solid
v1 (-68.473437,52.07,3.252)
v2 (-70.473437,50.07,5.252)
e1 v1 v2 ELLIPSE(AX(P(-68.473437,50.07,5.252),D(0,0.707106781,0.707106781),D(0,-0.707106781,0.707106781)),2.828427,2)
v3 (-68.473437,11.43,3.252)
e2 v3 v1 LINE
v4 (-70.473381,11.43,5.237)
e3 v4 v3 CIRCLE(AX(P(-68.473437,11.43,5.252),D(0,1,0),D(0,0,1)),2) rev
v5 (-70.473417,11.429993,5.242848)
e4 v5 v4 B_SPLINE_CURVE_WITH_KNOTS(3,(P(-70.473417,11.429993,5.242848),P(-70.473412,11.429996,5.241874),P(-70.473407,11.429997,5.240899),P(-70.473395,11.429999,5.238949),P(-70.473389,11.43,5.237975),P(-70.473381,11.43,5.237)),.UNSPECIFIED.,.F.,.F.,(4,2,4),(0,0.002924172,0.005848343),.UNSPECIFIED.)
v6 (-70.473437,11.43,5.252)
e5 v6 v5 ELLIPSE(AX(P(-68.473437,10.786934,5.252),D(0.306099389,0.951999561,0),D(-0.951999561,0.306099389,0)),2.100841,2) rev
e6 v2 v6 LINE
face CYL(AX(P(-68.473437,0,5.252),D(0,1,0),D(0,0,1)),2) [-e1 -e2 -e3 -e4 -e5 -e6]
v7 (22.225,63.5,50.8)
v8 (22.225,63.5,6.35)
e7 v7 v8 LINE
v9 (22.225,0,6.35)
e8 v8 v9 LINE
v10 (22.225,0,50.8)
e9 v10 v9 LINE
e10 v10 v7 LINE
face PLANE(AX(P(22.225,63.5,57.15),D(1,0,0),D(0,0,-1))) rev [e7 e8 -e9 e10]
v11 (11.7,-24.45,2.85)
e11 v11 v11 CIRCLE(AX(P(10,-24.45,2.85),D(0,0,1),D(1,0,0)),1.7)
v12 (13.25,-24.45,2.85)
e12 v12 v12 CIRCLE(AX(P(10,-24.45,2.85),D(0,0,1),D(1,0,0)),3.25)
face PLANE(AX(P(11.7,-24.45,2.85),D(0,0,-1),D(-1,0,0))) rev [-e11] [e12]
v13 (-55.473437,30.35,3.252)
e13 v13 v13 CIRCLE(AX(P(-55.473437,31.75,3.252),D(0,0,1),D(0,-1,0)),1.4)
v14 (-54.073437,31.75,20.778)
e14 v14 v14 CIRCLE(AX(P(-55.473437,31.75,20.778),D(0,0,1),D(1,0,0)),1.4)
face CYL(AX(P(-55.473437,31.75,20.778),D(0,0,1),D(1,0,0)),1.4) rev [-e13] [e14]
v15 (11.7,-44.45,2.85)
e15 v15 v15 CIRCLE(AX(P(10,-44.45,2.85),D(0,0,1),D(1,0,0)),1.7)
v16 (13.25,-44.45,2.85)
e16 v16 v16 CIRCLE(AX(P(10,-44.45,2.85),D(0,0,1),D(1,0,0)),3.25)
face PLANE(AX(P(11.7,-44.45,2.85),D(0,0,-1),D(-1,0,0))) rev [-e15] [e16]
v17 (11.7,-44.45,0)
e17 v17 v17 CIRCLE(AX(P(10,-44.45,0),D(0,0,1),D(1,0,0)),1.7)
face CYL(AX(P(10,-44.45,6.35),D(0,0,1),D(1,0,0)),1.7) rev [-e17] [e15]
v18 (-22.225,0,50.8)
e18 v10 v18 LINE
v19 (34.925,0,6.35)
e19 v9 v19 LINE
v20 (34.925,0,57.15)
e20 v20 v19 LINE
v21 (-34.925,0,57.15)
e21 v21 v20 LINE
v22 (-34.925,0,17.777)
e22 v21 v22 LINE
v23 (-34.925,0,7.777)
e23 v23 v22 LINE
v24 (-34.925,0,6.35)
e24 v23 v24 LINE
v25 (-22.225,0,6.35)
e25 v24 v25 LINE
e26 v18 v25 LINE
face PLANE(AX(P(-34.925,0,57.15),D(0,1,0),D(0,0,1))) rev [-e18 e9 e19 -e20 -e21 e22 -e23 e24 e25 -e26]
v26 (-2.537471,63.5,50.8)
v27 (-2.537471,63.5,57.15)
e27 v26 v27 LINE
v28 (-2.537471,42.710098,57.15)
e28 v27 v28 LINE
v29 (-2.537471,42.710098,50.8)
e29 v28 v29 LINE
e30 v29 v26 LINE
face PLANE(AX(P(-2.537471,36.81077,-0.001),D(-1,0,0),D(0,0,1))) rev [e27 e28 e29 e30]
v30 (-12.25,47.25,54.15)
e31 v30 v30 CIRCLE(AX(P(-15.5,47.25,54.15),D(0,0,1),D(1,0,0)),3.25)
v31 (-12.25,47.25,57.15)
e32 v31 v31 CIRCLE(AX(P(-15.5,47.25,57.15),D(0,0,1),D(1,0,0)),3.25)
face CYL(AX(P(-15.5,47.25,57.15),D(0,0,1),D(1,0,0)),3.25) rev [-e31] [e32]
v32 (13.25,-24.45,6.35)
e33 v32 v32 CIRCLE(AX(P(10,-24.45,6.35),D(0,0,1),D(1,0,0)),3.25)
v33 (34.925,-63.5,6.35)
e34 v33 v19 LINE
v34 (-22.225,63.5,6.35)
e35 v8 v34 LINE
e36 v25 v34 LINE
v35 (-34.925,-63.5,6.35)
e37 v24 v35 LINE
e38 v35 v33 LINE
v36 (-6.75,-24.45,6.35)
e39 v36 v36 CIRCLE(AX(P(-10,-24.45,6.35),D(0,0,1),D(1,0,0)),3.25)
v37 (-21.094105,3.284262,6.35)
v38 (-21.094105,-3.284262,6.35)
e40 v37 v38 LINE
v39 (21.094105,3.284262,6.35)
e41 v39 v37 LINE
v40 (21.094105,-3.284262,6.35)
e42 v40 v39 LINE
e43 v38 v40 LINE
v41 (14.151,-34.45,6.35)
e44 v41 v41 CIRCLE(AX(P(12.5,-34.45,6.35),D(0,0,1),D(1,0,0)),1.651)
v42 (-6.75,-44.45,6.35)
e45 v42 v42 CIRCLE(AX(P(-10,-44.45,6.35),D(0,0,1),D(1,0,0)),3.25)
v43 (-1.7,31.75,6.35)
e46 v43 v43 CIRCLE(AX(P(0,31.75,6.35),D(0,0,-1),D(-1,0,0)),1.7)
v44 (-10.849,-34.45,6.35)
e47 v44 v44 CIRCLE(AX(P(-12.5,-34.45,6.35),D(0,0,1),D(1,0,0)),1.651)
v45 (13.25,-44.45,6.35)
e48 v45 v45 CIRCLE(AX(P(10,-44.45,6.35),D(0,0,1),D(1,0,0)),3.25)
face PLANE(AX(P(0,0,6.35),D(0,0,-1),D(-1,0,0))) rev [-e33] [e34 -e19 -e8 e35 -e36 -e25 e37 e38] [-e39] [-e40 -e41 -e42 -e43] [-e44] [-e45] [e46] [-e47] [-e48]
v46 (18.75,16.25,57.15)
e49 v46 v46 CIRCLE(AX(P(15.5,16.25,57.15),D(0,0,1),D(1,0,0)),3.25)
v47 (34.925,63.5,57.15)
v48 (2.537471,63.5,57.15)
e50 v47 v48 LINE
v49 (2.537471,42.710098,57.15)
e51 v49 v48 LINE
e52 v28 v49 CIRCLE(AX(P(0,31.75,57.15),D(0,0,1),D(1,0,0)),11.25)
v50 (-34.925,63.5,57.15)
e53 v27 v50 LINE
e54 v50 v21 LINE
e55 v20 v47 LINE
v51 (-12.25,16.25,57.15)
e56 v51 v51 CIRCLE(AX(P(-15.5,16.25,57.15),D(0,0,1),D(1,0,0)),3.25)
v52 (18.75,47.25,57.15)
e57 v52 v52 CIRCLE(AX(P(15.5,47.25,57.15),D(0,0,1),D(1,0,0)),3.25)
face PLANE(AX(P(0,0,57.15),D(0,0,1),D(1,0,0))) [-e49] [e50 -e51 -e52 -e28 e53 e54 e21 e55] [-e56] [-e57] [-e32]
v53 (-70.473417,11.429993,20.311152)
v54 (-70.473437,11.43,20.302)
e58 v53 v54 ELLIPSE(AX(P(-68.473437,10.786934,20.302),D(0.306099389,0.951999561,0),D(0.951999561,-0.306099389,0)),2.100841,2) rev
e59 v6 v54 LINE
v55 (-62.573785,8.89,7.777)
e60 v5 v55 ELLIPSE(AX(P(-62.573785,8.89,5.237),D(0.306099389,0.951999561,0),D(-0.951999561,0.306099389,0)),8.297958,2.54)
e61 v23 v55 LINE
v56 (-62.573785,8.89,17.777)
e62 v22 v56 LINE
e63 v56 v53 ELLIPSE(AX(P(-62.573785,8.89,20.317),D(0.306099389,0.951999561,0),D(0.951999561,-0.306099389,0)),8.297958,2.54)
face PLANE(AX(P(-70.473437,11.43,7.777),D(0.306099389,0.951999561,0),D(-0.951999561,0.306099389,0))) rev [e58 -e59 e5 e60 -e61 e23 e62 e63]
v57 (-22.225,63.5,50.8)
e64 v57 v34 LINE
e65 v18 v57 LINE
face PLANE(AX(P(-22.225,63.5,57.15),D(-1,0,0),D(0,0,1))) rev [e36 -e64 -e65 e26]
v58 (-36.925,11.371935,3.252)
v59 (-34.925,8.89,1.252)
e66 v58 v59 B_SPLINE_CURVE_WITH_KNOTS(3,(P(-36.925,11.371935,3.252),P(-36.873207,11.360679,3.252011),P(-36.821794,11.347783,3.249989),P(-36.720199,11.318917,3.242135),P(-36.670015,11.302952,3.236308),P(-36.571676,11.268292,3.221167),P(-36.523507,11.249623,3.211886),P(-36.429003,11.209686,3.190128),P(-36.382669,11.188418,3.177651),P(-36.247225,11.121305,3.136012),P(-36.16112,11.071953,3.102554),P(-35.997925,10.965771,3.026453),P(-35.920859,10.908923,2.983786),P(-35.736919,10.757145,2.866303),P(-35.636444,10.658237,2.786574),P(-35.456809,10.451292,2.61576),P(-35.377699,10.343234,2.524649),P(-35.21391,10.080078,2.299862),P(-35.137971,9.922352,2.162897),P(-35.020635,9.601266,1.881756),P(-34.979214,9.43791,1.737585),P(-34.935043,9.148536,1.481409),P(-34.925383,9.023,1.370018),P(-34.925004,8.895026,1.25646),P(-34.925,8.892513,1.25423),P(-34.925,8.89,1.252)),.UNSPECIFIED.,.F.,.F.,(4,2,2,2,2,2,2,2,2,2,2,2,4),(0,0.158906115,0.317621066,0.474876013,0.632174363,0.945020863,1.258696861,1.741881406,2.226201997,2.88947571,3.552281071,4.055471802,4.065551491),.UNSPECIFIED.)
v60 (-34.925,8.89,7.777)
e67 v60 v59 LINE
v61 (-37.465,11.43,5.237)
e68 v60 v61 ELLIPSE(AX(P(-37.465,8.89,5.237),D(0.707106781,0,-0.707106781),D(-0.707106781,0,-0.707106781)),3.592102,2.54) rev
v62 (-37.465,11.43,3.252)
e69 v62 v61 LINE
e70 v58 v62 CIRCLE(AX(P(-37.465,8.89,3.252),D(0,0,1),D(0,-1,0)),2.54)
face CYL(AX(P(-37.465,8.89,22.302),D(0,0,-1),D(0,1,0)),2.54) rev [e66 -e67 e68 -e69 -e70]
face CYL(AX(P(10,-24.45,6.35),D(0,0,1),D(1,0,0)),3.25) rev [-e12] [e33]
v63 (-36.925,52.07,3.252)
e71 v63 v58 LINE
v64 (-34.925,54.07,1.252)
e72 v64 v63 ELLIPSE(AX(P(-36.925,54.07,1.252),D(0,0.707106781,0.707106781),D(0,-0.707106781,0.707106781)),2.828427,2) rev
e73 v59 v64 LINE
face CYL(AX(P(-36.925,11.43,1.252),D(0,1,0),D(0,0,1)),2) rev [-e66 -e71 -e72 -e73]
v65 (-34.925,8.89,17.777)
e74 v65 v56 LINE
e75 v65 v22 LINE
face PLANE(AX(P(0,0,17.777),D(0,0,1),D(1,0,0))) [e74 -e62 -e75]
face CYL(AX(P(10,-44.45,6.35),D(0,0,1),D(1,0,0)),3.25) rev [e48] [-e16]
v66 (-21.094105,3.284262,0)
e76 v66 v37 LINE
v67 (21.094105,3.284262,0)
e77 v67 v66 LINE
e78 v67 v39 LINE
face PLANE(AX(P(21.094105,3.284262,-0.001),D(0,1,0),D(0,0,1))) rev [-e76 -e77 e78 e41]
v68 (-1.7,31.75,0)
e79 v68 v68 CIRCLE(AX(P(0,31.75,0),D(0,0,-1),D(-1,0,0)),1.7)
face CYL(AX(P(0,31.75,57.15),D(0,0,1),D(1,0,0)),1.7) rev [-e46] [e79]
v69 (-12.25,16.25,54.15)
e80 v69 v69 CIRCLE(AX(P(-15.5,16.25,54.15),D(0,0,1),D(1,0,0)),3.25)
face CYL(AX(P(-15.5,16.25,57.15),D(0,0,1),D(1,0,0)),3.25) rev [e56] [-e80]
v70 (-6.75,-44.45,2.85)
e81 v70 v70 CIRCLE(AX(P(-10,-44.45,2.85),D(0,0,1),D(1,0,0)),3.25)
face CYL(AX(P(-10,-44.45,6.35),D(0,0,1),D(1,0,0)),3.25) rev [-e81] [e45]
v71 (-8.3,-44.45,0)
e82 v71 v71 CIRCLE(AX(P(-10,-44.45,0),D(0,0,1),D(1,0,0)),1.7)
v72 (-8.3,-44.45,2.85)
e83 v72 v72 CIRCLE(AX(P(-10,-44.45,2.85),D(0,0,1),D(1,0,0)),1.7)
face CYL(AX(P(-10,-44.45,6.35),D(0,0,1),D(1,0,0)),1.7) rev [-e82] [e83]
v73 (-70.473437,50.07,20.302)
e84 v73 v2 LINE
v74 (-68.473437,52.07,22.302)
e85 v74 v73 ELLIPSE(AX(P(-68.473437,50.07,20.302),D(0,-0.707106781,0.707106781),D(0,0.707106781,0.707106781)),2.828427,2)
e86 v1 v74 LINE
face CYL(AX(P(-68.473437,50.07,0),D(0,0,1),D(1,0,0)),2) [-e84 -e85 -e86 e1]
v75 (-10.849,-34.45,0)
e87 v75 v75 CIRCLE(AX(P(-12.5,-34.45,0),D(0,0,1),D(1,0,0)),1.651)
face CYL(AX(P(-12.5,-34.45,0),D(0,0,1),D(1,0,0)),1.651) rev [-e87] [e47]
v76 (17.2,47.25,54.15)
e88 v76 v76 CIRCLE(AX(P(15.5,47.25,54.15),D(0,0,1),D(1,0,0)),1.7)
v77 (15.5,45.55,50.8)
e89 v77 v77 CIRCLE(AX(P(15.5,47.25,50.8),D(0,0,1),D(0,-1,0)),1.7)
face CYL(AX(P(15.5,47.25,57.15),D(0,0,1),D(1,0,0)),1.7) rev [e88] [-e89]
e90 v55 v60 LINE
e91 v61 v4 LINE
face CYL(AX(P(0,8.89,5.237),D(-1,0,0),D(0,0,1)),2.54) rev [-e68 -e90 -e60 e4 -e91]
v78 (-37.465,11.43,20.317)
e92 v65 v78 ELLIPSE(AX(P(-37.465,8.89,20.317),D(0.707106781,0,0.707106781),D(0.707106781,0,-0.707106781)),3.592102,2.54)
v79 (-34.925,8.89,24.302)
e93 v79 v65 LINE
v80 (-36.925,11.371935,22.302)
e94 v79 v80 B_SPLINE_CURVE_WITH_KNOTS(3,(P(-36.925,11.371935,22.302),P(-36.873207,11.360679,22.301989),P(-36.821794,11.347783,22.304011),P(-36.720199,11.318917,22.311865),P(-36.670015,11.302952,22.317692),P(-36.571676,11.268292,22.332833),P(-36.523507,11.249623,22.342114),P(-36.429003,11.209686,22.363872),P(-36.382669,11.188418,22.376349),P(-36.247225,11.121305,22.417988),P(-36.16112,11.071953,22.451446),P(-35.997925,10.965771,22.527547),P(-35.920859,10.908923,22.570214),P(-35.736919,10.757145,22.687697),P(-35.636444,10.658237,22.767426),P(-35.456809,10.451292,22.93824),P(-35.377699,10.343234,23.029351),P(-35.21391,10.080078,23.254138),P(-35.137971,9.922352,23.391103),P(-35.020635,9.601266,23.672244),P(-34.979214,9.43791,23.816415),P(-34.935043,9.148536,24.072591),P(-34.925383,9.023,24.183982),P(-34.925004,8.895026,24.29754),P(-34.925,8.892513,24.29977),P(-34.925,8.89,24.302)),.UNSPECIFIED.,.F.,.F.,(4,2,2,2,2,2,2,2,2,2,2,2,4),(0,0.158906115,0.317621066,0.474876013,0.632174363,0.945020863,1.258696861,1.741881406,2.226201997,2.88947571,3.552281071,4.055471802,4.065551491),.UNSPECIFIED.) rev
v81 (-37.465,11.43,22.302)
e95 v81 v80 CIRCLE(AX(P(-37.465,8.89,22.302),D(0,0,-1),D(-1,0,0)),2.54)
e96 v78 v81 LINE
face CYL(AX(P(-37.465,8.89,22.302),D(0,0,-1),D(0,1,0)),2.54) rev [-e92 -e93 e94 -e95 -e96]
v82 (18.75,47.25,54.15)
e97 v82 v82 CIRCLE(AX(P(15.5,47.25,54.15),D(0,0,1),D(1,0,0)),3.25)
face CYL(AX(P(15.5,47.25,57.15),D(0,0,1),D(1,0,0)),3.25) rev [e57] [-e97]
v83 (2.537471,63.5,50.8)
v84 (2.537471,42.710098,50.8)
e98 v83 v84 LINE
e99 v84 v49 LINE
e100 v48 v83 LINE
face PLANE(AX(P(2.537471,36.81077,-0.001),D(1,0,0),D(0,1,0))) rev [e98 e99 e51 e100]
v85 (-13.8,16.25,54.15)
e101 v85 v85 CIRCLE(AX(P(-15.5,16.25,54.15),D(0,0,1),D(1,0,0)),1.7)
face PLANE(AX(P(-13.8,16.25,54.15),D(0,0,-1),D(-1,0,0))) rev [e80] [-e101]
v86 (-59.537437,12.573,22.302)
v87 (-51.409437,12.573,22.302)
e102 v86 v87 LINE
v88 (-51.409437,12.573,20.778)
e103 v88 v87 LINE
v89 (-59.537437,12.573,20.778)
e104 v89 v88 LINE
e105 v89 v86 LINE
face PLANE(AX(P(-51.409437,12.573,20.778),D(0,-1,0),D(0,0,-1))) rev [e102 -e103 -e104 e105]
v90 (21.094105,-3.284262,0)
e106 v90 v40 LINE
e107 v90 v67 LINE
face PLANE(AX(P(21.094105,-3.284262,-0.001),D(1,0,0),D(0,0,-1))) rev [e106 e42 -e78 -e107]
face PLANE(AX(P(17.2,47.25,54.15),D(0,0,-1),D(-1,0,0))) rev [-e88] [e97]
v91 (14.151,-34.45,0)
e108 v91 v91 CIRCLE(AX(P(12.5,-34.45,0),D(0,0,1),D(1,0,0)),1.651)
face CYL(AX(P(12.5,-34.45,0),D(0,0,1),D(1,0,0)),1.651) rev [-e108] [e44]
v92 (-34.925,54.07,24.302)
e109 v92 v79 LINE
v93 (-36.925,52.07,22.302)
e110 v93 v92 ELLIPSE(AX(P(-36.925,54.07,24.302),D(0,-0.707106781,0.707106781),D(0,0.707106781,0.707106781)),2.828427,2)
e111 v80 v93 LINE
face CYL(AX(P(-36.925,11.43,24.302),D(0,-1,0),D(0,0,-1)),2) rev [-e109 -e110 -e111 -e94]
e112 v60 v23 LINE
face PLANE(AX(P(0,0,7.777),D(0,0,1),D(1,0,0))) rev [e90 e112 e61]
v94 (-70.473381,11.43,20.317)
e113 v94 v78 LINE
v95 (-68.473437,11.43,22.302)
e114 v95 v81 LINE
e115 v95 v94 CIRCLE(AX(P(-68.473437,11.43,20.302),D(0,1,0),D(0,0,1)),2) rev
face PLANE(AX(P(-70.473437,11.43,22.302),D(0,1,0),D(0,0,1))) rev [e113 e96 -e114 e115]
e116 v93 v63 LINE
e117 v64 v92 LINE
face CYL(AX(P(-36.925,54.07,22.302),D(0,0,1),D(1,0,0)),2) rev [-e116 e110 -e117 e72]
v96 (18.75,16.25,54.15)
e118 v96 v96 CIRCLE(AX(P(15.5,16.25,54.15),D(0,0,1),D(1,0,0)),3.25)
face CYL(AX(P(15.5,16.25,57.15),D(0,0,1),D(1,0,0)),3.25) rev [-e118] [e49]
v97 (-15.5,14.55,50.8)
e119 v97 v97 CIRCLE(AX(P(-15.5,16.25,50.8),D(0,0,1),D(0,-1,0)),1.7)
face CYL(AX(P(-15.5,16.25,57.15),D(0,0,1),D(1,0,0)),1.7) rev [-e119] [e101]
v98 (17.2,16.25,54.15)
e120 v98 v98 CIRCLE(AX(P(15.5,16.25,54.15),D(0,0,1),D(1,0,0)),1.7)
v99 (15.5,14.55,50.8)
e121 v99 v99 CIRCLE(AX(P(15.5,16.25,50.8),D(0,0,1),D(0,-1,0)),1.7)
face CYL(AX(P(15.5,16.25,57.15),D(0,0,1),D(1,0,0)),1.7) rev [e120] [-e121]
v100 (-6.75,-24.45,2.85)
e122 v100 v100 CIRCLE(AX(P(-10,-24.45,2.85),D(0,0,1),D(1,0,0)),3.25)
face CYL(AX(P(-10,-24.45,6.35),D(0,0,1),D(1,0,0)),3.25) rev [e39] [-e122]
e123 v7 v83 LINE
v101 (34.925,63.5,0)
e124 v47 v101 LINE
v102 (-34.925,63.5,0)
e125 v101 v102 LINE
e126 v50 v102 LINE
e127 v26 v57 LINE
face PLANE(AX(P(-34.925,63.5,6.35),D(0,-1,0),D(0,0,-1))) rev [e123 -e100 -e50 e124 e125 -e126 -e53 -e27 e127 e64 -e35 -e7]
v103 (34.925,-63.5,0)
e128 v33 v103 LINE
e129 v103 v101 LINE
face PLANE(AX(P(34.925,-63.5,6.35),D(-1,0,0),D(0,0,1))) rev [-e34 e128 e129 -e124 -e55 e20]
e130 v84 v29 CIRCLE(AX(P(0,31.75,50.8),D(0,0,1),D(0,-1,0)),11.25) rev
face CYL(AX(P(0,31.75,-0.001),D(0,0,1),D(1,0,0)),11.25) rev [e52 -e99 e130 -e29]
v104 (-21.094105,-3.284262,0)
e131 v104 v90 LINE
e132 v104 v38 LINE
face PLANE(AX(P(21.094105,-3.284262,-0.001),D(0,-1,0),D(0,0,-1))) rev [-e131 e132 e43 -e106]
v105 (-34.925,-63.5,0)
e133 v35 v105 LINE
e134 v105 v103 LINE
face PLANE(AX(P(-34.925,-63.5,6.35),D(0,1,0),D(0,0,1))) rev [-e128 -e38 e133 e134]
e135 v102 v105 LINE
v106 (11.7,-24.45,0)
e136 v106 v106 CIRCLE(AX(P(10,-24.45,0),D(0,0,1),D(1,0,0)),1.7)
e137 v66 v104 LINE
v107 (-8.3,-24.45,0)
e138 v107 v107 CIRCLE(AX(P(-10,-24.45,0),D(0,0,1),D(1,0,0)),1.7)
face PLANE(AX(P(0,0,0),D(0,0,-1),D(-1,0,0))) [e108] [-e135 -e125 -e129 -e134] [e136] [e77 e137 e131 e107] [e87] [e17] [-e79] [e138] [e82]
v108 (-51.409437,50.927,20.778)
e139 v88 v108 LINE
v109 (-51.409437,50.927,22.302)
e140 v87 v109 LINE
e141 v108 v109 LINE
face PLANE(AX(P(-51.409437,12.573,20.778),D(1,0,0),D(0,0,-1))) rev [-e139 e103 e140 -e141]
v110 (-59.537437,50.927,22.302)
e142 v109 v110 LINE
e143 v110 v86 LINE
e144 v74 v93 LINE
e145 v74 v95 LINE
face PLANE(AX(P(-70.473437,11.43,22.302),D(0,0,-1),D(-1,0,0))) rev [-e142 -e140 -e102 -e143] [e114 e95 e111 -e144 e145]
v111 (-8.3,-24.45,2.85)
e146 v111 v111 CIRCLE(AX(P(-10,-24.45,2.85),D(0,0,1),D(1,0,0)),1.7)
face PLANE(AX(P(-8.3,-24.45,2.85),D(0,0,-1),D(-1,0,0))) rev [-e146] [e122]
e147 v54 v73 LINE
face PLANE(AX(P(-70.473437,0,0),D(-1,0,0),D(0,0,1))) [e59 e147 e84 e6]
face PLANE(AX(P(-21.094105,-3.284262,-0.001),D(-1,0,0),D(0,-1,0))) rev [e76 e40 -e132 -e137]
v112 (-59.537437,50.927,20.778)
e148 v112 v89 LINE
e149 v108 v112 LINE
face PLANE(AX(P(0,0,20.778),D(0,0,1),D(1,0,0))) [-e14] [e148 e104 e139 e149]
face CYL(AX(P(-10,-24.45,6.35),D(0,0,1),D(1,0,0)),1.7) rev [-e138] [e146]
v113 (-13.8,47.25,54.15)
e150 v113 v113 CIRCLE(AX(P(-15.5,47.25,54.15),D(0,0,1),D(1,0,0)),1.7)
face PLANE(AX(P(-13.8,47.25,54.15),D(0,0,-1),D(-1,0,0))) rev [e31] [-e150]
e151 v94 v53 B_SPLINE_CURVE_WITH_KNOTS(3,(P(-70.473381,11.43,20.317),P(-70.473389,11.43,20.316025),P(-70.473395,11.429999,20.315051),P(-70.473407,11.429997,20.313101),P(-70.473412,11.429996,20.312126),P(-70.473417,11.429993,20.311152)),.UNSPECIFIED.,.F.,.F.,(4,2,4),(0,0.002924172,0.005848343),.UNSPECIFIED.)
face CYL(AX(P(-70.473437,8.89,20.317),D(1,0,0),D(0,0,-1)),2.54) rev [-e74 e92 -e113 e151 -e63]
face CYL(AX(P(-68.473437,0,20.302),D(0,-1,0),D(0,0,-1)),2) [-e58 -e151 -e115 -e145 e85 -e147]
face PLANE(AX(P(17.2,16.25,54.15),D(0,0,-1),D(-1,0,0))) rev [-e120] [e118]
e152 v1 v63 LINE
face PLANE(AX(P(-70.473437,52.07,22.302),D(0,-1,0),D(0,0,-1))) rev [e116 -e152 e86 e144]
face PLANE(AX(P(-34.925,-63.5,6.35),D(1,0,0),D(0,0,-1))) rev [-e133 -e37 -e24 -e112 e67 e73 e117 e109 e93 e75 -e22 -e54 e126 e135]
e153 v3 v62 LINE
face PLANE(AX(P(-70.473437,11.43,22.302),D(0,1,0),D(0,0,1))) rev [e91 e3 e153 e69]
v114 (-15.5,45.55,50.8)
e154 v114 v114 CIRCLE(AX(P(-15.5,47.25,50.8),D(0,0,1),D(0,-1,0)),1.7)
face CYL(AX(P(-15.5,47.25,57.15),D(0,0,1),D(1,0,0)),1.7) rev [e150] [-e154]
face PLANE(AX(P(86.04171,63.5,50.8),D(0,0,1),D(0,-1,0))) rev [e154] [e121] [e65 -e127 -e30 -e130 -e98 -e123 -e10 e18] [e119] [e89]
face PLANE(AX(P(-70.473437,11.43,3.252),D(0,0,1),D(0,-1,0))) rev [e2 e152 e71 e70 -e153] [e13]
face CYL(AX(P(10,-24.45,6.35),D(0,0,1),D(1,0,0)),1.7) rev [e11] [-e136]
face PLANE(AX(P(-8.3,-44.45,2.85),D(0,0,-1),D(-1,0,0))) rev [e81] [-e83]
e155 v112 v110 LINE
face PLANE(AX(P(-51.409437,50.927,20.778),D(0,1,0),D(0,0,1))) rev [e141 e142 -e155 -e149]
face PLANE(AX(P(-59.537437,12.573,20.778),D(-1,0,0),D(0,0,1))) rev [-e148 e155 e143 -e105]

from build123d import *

# Parameters (mm, degrees)
SKETCH4_W                      = 69.85
SKETCH4_H                      = 127
BOSS_EXTRUDE4_DEPTH            = 6.35
CBORE_FOR_M3_SHCS1_D           = 3.4
CBORE_FOR_M3_SHCS1_CBORE_D     = 6.5
CBORE_FOR_M3_SHCS1_CBORE_DEPTH = 3.5
SKETCH7_R                      = 1.651
CUT_EXTRUDE1_DEPTH             = 73.748389157
SKETCH16_W                     = 12.7
SKETCH16_H                     = 63.5
BOSS_EXTRUDE6_DEPTH            = 50.8
SKETCH18_W                     = 6.35
SKETCH18_H                     = 63.5
BOSS_EXTRUDE7_DEPTH            = 44.45
CUT_EXTRUDE3_REACH             = 94.294
SKETCH21_R                     = 11.25
CBORE_START                    = 54.15
CBORE_FOR_M3_SHCS3_OUTLINE_R   = 3.25
CBORE_FOR_M3_SHCS3_DEPTH       = 3
CBORE_START_2                  = 50.8
CBORE_FOR_M3_SHCS3_2_OUTLINE_R = 1.7
CBORE_FOR_M3_SHCS3_2_DEPTH     = 3.35
CBORE_FOR_M3_SHCS3_3_OUTLINE_R = 1.7
CBORE_FOR_M3_SHCS3_3_DEPTH     = 6.35
CUT_EXTRUDE5_REACH             = 94.294
CUT_EXTRUDE6_REACH             = 90.502
SKETCH24_W                     = 42.188209008
SKETCH24_H                     = 6.56852392
SKETCH25_W                     = 19.05
SKETCH25_H                     = 40.64
BOSS_EXTRUDE8_DEPTH            = 35.548437
BOSS_EXTRUDE9_DEPTH            = 5
SKETCH32_W                     = 8.128
SKETCH32_H                     = 38.354
CUT_EXTRUDE8_DEPTH             = 1.524
M3_CLEARANCE_HOLE2_D           = 2.8
FILLET6_R                      = 2.54
FILLET9_R                      = 2
FILLET10_R                     = 2
FILLET11_R                     = 2


# Read off the part's stored shape, not the designer's step: CBORE for M3 SHCS3
with BuildPart() as part:
    # Sketch4 → Boss-Extrude4 (new body)
    with BuildSketch(Plane.XY):
        Rectangle(SKETCH4_W, SKETCH4_H)
    extrude(amount=BOSS_EXTRUDE4_DEPTH)

    # CBORE for M3 SHCS1 (through all)
    with Locations(Plane.XY.offset(6.35)):
        with Locations((-10, -24.45), (10, -44.45), (10, -24.45), (-10, -44.45)):
            CounterBoreHole(CBORE_FOR_M3_SHCS1_D / 2, CBORE_FOR_M3_SHCS1_CBORE_D / 2, CBORE_FOR_M3_SHCS1_CBORE_DEPTH)

    # Sketch7 → Cut-Extrude1 (cut, through all)
    with BuildSketch(Plane.XY.offset(6.35)):
        with Locations((-12.5, -34.45)):
            Circle(SKETCH7_R)
        with Locations((12.5, -34.45)):
            Circle(SKETCH7_R)
    extrude(amount=-CUT_EXTRUDE1_DEPTH, mode=Mode.SUBTRACT)

    # Sketch16 → Boss-Extrude6 (add)
    with BuildSketch(Plane.XY.offset(6.35)):
        with Locations((-28.575, 31.75)):
            Rectangle(SKETCH16_W, SKETCH16_H)
        with Locations((28.575, 31.75)):
            Rectangle(SKETCH16_W, SKETCH16_H)
    extrude(amount=BOSS_EXTRUDE6_DEPTH)

    # Sketch18 → Boss-Extrude7 (add)
    with BuildSketch(Plane(origin=(-22.225, 0, 0), x_dir=(0, 0, -1), z_dir=(1, 0, 0))):
        with Locations((-53.975, 31.75)):
            Rectangle(SKETCH18_W, SKETCH18_H)
    extrude(amount=BOSS_EXTRUDE7_DEPTH)

    # Sketch21 → Cut-Extrude3 (cut, up to next)
    with BuildSketch(Plane.XY.offset(57.15), mode=Mode.PRIVATE) as cut_extrude3_sk1:
        with Locations((0, 31.75)):
            Circle(SKETCH21_R)
    cut_extrude3_tool1 = extrude(cut_extrude3_sk1.sketch, amount=-CUT_EXTRUDE3_REACH, mode=Mode.PRIVATE) & part.part
    add(cut_extrude3_tool1.solids().sort_by_distance((0, 31.75, 57.15))[0], mode=Mode.SUBTRACT)

    # CBORE for M3 SHCS3 outline → CBORE for M3 SHCS3 (cut)
    with BuildSketch(Plane.XY.offset(CBORE_START)):
        with Locations((-15.5, 47.25)):
            Circle(CBORE_FOR_M3_SHCS3_OUTLINE_R)
        with Locations((-15.5, 16.25)):
            Circle(CBORE_FOR_M3_SHCS3_OUTLINE_R)
        with Locations((15.5, 47.25)):
            Circle(CBORE_FOR_M3_SHCS3_OUTLINE_R)
        with Locations((15.5, 16.25)):
            Circle(CBORE_FOR_M3_SHCS3_OUTLINE_R)
    extrude(amount=CBORE_FOR_M3_SHCS3_DEPTH, mode=Mode.SUBTRACT)

    # CBORE for M3 SHCS3 2 outline → CBORE for M3 SHCS3 2 (cut)
    with BuildSketch(Plane.XY.offset(CBORE_START_2)):
        with Locations((-15.5, 47.25)):
            Circle(CBORE_FOR_M3_SHCS3_2_OUTLINE_R)
        with Locations((-15.5, 16.25)):
            Circle(CBORE_FOR_M3_SHCS3_2_OUTLINE_R)
        with Locations((15.5, 47.25)):
            Circle(CBORE_FOR_M3_SHCS3_2_OUTLINE_R)
        with Locations((15.5, 16.25)):
            Circle(CBORE_FOR_M3_SHCS3_2_OUTLINE_R)
    extrude(amount=CBORE_FOR_M3_SHCS3_2_DEPTH, mode=Mode.SUBTRACT)

    # CBORE for M3 SHCS3 3 outline → CBORE for M3 SHCS3 3 (cut)
    with BuildSketch(Plane.XY):
        with Locations((0, 31.75)):
            Circle(CBORE_FOR_M3_SHCS3_3_OUTLINE_R)
    extrude(amount=CBORE_FOR_M3_SHCS3_3_DEPTH, mode=Mode.SUBTRACT)

    # Sketch23 → Cut-Extrude5 (cut, up to next)
    with BuildSketch(Plane.XY.offset(57.15), mode=Mode.PRIVATE) as cut_extrude5_sk1:
        with BuildLine():
            Line((-2.53747066, 36.810770012), (-2.53747066, 63.5))
            ThreePointArc((-2.53747066, 63.5), (0, 66.03747066), (2.53747066, 63.5))
            Line((2.53747066, 63.5), (2.53747066, 36.810770012))
            ThreePointArc((2.53747066, 36.810770012), (0, 34.273299352), (-2.53747066, 36.810770012))
        make_face()
    cut_extrude5_tool1 = extrude(cut_extrude5_sk1.sketch, amount=-CUT_EXTRUDE5_REACH, mode=Mode.PRIVATE) & part.part
    add(cut_extrude5_tool1.solids().sort_by_distance((0, 50.155385, 57.15))[0], mode=Mode.SUBTRACT)

    # Sketch24 → Cut-Extrude6 (cut, up to next)
    with BuildSketch(Plane.XY.offset(6.35), mode=Mode.PRIVATE) as cut_extrude6_sk1:
        Rectangle(SKETCH24_W, SKETCH24_H)
    cut_extrude6_tool1 = extrude(cut_extrude6_sk1.sketch, amount=-CUT_EXTRUDE6_REACH, mode=Mode.PRIVATE) & part.part
    add(cut_extrude6_tool1.solids().sort_by_distance((0, 0, 6.35))[0], mode=Mode.SUBTRACT)

    # Sketch25 → Boss-Extrude8 (add)
    with BuildSketch(Plane.ZY.offset(34.925)):
        with Locations((12.777, 31.75)):
            Rectangle(SKETCH25_W, SKETCH25_H)
    extrude(amount=BOSS_EXTRUDE8_DEPTH)

    # Sketch31 → Boss-Extrude9 (add, symmetric)
    with BuildSketch(Plane(origin=(0, 0, 12.777), x_dir=(-1, 0, 0), z_dir=(0, 0, -1))):
        Polygon((34.925, 11.43), (70.4734375, 11.43), (34.925, 0), align=None)
    extrude(amount=BOSS_EXTRUDE9_DEPTH, both=True)

    # Sketch32 → Cut-Extrude8 (cut)
    with BuildSketch(Plane.XY.offset(22.302)):
        with Locations((-55.4734375, 31.75)):
            Rectangle(SKETCH32_W, SKETCH32_H)
    extrude(amount=-CUT_EXTRUDE8_DEPTH, mode=Mode.SUBTRACT)

    # M3 Clearance Hole2 (through all)
    with Locations(Plane.XY.offset(20.778)):
        with Locations((-55.4734375, 31.75)):
            Hole(M3_CLEARANCE_HOLE2_D / 2)

    # Fillet6
    fillet6_edges = [part.edges().sort_by_distance(p)[0] for p in [
        (-34.925, 11.43, 5.5145),
        (-34.925, 11.43, 20.0395),
        (-52.699218512, 11.43, 17.777),
        (-52.699218512, 11.43, 7.777),
    ]]
    fillet(fillet6_edges, radius=FILLET6_R)

    # Fillet9
    # the kernel refuses this fillet: 2 mm, written as the material it takes off along each edge
    with BuildSketch(Plane(origin=(-70.473437, 57.07, 22.302), x_dir=(0, 0, -1), z_dir=(0, -1, 0)), Plane(origin=(-70.473437, 6.43, 3.252), x_dir=(0, 0, 1), z_dir=(0, 1, 0))) as fillet9_piece_1:
        with BuildLine():
            CenterArc((FILLET9_R, FILLET9_R), FILLET9_R, 180, 90)
            Line((0, FILLET9_R), (0, 0))
            Line((0, 0), (FILLET9_R, 0))
        make_face()
    extrude(amount=50.64, mode=Mode.SUBTRACT)
    with BuildSketch(Plane(origin=(-70.473437, 52.07, -1.748), x_dir=(0, -1, 0), z_dir=(0, 0, 1))) as fillet9_piece_2:
        with BuildLine():
            CenterArc((FILLET9_R, FILLET9_R), FILLET9_R, 180, 90)
            Line((0, FILLET9_R), (0, 0))
            Line((0, 0), (FILLET9_R, 0))
        make_face()
    extrude(amount=29.05, mode=Mode.SUBTRACT)

    # Fillet10
    fillet10_edges = [part.edges().sort_by_distance(p)[0] for p in [
        (-34.925, 52.07, 12.777),
    ]]
    fillet(fillet10_edges, radius=FILLET10_R)

    # Fillet11
    fillet11_edges = [part.edges().sort_by_distance(p)[0] for p in [
        (-34.925, 31.48, 3.252),
        (-34.925, 31.48, 22.302),
    ]]
    fillet(fillet11_edges, radius=FILLET11_R)


solid = part.part
